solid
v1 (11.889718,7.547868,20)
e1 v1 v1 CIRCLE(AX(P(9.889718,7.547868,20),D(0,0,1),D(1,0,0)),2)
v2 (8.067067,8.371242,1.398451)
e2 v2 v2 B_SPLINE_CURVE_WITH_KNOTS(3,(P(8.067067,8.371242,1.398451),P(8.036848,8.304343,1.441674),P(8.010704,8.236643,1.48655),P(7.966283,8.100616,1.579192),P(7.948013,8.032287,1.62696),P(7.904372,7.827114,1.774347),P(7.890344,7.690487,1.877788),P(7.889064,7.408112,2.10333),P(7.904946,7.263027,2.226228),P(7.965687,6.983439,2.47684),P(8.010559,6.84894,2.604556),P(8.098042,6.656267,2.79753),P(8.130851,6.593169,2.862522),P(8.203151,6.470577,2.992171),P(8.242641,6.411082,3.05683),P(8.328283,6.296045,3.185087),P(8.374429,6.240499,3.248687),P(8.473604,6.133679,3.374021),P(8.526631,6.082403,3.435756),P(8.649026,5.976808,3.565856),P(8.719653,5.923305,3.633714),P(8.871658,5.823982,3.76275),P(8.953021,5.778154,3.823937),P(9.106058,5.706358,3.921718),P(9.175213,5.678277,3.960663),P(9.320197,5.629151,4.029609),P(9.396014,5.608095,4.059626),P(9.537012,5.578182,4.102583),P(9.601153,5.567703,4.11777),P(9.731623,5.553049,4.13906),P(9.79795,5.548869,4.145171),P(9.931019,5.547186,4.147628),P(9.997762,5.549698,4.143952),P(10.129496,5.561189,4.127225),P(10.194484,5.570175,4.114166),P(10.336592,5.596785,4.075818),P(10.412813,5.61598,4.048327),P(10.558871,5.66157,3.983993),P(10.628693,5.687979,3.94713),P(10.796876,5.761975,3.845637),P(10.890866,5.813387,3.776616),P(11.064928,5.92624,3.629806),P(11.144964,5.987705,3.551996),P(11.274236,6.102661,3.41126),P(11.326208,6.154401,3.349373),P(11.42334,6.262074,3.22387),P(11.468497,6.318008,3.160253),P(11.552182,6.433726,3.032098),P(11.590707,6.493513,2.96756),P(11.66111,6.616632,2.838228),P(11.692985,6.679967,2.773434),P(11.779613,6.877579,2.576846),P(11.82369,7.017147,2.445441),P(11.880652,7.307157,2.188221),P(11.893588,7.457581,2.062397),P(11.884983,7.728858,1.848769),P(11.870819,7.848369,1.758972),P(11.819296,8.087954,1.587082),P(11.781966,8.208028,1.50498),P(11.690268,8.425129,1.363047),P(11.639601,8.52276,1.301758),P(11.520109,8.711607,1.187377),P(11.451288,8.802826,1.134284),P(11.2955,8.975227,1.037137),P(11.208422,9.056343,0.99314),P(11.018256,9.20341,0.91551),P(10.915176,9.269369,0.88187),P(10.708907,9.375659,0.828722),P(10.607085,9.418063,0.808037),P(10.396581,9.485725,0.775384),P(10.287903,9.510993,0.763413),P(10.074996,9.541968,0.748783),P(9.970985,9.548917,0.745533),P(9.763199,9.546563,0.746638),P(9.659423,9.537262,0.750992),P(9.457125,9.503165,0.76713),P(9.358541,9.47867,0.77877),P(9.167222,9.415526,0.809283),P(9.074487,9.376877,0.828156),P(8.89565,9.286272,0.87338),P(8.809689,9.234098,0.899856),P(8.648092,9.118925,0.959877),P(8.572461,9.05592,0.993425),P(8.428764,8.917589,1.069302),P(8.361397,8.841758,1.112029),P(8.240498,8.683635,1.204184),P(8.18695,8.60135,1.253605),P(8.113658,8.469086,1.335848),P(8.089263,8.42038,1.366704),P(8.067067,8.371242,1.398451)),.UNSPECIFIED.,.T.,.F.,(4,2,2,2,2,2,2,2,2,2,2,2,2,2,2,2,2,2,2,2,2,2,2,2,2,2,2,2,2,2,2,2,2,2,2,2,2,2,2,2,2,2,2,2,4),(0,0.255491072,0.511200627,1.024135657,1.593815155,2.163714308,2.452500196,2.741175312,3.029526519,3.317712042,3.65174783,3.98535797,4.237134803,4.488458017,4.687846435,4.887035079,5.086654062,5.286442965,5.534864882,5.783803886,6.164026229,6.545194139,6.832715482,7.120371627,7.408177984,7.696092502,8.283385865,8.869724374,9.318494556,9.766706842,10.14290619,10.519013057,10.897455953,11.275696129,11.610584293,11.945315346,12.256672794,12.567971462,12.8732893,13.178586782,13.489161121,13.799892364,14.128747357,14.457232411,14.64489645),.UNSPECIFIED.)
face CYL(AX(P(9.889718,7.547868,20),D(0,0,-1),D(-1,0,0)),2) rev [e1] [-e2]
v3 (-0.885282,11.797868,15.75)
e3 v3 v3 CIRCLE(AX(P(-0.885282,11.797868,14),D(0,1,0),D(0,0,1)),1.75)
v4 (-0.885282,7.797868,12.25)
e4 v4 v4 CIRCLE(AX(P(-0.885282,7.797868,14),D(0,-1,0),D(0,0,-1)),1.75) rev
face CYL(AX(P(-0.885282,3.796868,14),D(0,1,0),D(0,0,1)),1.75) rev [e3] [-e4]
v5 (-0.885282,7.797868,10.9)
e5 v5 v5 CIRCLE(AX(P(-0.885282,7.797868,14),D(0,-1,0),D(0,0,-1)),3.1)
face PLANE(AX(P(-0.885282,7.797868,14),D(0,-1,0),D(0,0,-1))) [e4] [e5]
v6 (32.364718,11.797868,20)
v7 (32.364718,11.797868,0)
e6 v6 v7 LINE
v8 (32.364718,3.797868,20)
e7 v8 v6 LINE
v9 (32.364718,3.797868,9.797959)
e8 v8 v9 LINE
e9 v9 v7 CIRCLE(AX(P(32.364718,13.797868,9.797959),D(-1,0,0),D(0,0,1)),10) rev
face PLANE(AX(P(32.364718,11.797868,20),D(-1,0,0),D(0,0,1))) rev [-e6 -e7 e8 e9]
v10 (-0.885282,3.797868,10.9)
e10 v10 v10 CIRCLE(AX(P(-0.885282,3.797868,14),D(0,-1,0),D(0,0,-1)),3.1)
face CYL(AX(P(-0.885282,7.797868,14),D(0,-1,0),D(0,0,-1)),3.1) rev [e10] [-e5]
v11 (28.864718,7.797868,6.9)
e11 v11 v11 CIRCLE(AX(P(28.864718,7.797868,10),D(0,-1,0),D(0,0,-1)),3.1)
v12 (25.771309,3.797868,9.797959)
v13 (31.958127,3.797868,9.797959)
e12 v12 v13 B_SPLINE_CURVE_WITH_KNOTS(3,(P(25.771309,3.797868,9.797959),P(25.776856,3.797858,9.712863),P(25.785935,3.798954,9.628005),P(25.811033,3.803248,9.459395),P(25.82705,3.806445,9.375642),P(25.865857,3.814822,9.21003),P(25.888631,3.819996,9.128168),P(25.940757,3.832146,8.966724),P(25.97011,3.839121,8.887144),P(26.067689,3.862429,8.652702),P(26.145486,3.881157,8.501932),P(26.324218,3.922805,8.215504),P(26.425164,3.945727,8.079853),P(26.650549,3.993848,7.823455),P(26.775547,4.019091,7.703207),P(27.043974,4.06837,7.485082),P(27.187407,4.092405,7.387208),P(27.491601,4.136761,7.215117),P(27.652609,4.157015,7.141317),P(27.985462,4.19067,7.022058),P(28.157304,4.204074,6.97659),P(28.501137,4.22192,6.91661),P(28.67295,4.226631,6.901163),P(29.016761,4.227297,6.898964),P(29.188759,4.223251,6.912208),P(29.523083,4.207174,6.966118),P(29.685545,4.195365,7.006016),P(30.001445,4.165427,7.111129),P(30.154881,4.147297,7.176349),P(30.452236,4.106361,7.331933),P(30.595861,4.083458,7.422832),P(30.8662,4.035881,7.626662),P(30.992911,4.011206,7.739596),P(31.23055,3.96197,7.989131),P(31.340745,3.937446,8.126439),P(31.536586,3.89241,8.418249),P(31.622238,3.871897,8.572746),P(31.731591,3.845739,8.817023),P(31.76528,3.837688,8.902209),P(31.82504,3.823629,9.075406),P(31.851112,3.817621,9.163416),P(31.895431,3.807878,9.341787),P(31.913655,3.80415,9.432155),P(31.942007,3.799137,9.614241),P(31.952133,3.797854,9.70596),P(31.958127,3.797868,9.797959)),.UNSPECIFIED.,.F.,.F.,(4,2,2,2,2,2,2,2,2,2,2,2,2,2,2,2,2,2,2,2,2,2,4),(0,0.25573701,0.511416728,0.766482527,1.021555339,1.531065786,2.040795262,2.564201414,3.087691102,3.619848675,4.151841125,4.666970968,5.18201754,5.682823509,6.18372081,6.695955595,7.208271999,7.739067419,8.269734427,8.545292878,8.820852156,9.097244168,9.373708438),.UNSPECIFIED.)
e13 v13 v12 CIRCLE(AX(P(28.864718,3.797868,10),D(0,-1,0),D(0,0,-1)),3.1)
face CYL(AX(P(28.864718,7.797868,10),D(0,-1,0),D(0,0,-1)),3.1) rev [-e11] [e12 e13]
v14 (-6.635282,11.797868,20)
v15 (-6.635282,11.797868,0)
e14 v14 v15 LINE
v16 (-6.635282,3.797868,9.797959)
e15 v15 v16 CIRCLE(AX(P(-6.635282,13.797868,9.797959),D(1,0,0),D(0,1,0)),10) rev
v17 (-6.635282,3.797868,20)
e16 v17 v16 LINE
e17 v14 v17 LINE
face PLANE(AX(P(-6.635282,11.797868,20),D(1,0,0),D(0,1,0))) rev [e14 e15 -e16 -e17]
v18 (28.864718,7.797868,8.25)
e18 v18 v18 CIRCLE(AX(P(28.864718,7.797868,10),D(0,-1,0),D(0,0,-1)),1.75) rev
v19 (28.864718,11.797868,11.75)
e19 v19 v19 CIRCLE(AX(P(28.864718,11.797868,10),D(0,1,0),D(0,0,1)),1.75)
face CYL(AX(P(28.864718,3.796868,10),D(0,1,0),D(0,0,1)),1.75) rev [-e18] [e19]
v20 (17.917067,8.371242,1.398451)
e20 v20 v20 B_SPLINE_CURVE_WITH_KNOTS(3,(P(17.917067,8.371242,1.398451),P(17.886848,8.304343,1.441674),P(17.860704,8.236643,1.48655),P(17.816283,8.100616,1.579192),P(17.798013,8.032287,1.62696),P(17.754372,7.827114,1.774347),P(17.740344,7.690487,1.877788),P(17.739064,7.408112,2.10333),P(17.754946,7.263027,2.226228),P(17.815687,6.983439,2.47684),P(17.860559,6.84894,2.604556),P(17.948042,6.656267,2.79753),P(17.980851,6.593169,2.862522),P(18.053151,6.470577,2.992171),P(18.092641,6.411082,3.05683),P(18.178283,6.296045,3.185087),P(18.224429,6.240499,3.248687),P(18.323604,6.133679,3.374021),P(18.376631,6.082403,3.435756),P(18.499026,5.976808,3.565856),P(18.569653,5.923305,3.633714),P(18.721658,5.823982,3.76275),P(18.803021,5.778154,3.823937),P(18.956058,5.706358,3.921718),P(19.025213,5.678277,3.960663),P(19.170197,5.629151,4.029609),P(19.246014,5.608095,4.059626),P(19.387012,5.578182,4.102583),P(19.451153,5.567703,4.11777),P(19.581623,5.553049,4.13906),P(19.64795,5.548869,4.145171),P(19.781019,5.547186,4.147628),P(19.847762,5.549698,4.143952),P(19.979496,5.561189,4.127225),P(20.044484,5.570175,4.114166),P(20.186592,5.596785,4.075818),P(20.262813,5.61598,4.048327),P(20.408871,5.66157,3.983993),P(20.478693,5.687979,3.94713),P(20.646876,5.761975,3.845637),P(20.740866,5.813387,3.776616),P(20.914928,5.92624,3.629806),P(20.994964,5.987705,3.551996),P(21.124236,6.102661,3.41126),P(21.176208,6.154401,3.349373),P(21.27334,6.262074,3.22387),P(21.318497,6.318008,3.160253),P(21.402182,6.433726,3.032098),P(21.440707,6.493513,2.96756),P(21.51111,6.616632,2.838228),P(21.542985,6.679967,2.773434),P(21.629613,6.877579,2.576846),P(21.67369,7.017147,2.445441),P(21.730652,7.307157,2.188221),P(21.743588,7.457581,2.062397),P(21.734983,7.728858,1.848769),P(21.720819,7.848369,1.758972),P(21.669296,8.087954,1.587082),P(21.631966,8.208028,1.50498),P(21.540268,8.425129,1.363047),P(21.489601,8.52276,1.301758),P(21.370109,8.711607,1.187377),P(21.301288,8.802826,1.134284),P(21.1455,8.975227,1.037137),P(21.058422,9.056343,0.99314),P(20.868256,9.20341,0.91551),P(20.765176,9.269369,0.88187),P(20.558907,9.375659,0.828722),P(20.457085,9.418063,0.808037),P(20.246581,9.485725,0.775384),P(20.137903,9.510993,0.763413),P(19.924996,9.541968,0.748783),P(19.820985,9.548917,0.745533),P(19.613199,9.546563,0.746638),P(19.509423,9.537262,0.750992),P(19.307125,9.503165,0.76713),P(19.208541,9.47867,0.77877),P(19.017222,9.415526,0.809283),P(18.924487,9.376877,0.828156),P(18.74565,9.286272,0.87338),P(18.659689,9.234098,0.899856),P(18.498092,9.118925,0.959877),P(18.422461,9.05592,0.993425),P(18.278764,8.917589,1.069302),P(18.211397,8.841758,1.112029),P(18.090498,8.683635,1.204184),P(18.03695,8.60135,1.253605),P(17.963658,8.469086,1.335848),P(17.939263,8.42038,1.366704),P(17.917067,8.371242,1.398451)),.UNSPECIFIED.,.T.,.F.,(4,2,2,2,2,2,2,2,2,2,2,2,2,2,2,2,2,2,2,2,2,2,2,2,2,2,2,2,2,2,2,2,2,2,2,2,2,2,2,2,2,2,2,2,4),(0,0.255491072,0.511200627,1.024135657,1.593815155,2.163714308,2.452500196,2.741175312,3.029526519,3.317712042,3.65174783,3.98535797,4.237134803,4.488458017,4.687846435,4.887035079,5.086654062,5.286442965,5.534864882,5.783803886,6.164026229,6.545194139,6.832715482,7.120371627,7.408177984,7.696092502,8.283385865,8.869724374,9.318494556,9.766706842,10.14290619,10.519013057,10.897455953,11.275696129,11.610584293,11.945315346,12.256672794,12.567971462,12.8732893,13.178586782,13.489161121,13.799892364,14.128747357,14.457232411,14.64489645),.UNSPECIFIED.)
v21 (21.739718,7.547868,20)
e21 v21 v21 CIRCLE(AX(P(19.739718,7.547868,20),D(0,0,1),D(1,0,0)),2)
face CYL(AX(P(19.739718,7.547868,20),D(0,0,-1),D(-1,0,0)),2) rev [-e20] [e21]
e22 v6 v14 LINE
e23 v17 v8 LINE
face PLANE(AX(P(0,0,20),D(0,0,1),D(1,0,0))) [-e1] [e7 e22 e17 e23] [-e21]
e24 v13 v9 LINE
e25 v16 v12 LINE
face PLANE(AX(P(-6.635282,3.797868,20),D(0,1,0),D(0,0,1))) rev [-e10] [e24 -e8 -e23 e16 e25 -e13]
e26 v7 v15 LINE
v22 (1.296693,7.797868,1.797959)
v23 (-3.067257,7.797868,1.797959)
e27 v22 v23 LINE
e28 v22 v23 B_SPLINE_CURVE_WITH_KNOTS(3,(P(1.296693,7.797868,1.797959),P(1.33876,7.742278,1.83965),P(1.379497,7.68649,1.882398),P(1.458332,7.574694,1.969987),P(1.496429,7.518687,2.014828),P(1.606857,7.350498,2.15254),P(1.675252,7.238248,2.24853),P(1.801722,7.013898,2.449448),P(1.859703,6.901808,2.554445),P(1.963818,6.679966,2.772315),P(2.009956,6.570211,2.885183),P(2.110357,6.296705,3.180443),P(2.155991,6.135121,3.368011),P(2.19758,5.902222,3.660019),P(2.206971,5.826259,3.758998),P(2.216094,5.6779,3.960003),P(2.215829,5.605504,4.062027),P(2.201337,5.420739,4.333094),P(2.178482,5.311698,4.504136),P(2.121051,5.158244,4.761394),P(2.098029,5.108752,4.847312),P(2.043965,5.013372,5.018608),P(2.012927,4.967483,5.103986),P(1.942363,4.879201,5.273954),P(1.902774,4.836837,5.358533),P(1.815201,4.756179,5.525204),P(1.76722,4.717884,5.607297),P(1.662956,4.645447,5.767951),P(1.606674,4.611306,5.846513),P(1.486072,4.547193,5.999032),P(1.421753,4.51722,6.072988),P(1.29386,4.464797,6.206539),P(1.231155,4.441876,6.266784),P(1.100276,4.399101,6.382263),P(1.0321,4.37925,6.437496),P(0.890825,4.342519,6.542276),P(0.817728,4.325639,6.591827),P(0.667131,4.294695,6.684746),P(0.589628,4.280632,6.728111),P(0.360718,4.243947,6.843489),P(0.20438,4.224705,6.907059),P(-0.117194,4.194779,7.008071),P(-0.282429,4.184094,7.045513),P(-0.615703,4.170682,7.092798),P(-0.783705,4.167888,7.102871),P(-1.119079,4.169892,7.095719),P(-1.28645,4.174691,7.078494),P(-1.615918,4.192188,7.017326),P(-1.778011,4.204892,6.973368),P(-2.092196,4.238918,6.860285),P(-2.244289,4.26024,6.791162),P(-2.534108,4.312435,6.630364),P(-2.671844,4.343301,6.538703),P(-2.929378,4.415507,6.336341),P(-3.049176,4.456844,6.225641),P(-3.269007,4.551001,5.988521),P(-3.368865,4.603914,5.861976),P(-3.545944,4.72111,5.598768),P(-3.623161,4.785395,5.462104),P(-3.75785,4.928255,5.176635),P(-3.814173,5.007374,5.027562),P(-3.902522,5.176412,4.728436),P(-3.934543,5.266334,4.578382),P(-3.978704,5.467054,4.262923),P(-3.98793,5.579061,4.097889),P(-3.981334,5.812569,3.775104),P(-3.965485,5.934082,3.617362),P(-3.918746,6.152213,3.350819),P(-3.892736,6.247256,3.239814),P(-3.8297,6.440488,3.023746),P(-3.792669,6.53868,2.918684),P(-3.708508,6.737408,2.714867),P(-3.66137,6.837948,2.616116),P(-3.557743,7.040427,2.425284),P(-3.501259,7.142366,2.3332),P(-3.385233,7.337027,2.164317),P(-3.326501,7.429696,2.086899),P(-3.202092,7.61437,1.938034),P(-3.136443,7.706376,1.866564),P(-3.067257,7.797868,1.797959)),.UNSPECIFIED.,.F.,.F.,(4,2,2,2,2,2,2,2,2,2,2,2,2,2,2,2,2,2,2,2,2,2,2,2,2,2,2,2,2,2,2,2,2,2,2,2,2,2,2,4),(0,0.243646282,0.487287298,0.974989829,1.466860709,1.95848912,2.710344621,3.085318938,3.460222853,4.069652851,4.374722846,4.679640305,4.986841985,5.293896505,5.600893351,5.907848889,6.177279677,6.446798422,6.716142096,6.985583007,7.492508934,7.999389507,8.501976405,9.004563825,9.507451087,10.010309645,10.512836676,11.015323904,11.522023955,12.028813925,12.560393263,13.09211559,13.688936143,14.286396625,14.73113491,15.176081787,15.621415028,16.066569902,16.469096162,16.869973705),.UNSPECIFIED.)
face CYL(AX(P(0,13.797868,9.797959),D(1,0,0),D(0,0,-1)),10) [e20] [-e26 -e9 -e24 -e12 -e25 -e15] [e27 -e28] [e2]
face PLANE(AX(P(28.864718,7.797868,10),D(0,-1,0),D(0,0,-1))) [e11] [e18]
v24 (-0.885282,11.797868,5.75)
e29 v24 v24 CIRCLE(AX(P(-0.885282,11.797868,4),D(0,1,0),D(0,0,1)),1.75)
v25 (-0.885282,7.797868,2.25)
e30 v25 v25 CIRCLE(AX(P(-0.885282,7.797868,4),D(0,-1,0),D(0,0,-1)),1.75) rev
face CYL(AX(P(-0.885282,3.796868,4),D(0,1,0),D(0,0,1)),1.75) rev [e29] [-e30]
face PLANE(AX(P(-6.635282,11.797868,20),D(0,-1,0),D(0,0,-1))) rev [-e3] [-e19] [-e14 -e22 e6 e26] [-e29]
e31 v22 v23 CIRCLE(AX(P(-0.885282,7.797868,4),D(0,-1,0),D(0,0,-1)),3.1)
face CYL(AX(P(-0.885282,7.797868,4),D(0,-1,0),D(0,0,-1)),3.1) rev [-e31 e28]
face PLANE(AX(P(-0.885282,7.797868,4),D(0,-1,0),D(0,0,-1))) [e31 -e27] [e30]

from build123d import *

# Parameters (mm, degrees)
SKETCH1_W           = 39
SKETCH1_H           = 8
SKETCH1_R           = 2
BOSS_EXTRUDE1_DEPTH = 20
CUT_EXTRUDE3_REACH  = 40.878
SKETCH2_R           = 1.75
FILLET1_R           = 10
SKETCH3_R           = 3.1
CUT_EXTRUDE4_DEPTH  = 4


with BuildPart() as part:
    # Sketch1 → Boss-Extrude1 (new body)
    with BuildSketch(Plane.XY):
        with Locations((12.864717907, 7.797867952)):
            Rectangle(SKETCH1_W, SKETCH1_H)
        with Locations((9.889717907, 7.547867952)):
            Circle(SKETCH1_R, mode=Mode.SUBTRACT)
        with Locations((19.739717907, 7.547867952)):
            Circle(SKETCH1_R, mode=Mode.SUBTRACT)
    extrude(amount=BOSS_EXTRUDE1_DEPTH)

    # Sketch2 → Cut-Extrude3 (cut, up to next)
    with BuildSketch(Plane(origin=(0, 11.797867952, 0), x_dir=(1, 0, 0), z_dir=(0, 1, 0)), mode=Mode.PRIVATE) as cut_extrude3_sk1:
        with Locations(Location((28.864717907, -10, 0), (0, 0, 270))):
            Circle(SKETCH2_R)
    cut_extrude3_tool1 = extrude(cut_extrude3_sk1.sketch, amount=-CUT_EXTRUDE3_REACH, mode=Mode.PRIVATE) & part.part
    # Sketch2 → Cut-Extrude3 (cut, up to next)
    with BuildSketch(Plane(origin=(0, 11.797867952, 0), x_dir=(1, 0, 0), z_dir=(0, 1, 0)), mode=Mode.PRIVATE) as cut_extrude3_sk2:
        with Locations(Location((-0.885282093, -14, 0), (0, 0, 270))):
            Circle(SKETCH2_R)
    cut_extrude3_tool2 = extrude(cut_extrude3_sk2.sketch, amount=-CUT_EXTRUDE3_REACH, mode=Mode.PRIVATE) & part.part
    # Sketch2 → Cut-Extrude3 (cut, up to next)
    with BuildSketch(Plane(origin=(0, 11.797867952, 0), x_dir=(1, 0, 0), z_dir=(0, 1, 0)), mode=Mode.PRIVATE) as cut_extrude3_sk3:
        with Locations(Location((-0.885282093, -4, 0), (0, 0, 270))):
            Circle(SKETCH2_R)
    cut_extrude3_tool3 = extrude(cut_extrude3_sk3.sketch, amount=-CUT_EXTRUDE3_REACH, mode=Mode.PRIVATE) & part.part
    add(cut_extrude3_tool1.solids().sort_by_distance((28.864718, 11.797868, 10))[0], mode=Mode.SUBTRACT)
    add(cut_extrude3_tool2.solids().sort_by_distance((-0.885282, 11.797868, 14))[0], mode=Mode.SUBTRACT)
    add(cut_extrude3_tool3.solids().sort_by_distance((-0.885282, 11.797868, 4))[0], mode=Mode.SUBTRACT)

    # Fillet1
    # the kernel refuses this fillet: 10 mm, written as the material it takes off along each edge
    with BuildSketch(Plane(origin=(56.859615335, 3.797867952, 0), x_dir=(0, 1, 0), z_dir=(-1, 0, 0))) as fillet1_piece_1:
        with BuildLine():
            CenterArc((10, -9.797958971), FILLET1_R, 101.536959033, 78.463040967)
            Line((0, -9.797958971), (-0.2, -9.797958971))
            Line((-0.2, -9.797958971), (-0.2, 0))
            Line((-0.2, 0), (0, 0.2))
            ThreePointArc((0, 0.2), (4, 0.2), (7.96, 0.195959179))
            Line((7.96, 0.195959179), (8, 0))
        make_face()
    extrude(amount=87.989794856, mode=Mode.SUBTRACT)

    # Sketch3 → Cut-Extrude4 (cut)
    with BuildSketch(Plane.XZ.offset(-3.797867952)):
        with Locations(Location((-0.885282093, 14, 0), (0, 0, 270))):
            Circle(SKETCH3_R)
        with Locations(Location((28.864717907, 10, 0), (0, 0, 270))):
            Circle(SKETCH3_R)
        with Locations((-0.885282093, 4)):
            Circle(SKETCH3_R)
    extrude(amount=-CUT_EXTRUDE4_DEPTH, mode=Mode.SUBTRACT)


solid = part.part
